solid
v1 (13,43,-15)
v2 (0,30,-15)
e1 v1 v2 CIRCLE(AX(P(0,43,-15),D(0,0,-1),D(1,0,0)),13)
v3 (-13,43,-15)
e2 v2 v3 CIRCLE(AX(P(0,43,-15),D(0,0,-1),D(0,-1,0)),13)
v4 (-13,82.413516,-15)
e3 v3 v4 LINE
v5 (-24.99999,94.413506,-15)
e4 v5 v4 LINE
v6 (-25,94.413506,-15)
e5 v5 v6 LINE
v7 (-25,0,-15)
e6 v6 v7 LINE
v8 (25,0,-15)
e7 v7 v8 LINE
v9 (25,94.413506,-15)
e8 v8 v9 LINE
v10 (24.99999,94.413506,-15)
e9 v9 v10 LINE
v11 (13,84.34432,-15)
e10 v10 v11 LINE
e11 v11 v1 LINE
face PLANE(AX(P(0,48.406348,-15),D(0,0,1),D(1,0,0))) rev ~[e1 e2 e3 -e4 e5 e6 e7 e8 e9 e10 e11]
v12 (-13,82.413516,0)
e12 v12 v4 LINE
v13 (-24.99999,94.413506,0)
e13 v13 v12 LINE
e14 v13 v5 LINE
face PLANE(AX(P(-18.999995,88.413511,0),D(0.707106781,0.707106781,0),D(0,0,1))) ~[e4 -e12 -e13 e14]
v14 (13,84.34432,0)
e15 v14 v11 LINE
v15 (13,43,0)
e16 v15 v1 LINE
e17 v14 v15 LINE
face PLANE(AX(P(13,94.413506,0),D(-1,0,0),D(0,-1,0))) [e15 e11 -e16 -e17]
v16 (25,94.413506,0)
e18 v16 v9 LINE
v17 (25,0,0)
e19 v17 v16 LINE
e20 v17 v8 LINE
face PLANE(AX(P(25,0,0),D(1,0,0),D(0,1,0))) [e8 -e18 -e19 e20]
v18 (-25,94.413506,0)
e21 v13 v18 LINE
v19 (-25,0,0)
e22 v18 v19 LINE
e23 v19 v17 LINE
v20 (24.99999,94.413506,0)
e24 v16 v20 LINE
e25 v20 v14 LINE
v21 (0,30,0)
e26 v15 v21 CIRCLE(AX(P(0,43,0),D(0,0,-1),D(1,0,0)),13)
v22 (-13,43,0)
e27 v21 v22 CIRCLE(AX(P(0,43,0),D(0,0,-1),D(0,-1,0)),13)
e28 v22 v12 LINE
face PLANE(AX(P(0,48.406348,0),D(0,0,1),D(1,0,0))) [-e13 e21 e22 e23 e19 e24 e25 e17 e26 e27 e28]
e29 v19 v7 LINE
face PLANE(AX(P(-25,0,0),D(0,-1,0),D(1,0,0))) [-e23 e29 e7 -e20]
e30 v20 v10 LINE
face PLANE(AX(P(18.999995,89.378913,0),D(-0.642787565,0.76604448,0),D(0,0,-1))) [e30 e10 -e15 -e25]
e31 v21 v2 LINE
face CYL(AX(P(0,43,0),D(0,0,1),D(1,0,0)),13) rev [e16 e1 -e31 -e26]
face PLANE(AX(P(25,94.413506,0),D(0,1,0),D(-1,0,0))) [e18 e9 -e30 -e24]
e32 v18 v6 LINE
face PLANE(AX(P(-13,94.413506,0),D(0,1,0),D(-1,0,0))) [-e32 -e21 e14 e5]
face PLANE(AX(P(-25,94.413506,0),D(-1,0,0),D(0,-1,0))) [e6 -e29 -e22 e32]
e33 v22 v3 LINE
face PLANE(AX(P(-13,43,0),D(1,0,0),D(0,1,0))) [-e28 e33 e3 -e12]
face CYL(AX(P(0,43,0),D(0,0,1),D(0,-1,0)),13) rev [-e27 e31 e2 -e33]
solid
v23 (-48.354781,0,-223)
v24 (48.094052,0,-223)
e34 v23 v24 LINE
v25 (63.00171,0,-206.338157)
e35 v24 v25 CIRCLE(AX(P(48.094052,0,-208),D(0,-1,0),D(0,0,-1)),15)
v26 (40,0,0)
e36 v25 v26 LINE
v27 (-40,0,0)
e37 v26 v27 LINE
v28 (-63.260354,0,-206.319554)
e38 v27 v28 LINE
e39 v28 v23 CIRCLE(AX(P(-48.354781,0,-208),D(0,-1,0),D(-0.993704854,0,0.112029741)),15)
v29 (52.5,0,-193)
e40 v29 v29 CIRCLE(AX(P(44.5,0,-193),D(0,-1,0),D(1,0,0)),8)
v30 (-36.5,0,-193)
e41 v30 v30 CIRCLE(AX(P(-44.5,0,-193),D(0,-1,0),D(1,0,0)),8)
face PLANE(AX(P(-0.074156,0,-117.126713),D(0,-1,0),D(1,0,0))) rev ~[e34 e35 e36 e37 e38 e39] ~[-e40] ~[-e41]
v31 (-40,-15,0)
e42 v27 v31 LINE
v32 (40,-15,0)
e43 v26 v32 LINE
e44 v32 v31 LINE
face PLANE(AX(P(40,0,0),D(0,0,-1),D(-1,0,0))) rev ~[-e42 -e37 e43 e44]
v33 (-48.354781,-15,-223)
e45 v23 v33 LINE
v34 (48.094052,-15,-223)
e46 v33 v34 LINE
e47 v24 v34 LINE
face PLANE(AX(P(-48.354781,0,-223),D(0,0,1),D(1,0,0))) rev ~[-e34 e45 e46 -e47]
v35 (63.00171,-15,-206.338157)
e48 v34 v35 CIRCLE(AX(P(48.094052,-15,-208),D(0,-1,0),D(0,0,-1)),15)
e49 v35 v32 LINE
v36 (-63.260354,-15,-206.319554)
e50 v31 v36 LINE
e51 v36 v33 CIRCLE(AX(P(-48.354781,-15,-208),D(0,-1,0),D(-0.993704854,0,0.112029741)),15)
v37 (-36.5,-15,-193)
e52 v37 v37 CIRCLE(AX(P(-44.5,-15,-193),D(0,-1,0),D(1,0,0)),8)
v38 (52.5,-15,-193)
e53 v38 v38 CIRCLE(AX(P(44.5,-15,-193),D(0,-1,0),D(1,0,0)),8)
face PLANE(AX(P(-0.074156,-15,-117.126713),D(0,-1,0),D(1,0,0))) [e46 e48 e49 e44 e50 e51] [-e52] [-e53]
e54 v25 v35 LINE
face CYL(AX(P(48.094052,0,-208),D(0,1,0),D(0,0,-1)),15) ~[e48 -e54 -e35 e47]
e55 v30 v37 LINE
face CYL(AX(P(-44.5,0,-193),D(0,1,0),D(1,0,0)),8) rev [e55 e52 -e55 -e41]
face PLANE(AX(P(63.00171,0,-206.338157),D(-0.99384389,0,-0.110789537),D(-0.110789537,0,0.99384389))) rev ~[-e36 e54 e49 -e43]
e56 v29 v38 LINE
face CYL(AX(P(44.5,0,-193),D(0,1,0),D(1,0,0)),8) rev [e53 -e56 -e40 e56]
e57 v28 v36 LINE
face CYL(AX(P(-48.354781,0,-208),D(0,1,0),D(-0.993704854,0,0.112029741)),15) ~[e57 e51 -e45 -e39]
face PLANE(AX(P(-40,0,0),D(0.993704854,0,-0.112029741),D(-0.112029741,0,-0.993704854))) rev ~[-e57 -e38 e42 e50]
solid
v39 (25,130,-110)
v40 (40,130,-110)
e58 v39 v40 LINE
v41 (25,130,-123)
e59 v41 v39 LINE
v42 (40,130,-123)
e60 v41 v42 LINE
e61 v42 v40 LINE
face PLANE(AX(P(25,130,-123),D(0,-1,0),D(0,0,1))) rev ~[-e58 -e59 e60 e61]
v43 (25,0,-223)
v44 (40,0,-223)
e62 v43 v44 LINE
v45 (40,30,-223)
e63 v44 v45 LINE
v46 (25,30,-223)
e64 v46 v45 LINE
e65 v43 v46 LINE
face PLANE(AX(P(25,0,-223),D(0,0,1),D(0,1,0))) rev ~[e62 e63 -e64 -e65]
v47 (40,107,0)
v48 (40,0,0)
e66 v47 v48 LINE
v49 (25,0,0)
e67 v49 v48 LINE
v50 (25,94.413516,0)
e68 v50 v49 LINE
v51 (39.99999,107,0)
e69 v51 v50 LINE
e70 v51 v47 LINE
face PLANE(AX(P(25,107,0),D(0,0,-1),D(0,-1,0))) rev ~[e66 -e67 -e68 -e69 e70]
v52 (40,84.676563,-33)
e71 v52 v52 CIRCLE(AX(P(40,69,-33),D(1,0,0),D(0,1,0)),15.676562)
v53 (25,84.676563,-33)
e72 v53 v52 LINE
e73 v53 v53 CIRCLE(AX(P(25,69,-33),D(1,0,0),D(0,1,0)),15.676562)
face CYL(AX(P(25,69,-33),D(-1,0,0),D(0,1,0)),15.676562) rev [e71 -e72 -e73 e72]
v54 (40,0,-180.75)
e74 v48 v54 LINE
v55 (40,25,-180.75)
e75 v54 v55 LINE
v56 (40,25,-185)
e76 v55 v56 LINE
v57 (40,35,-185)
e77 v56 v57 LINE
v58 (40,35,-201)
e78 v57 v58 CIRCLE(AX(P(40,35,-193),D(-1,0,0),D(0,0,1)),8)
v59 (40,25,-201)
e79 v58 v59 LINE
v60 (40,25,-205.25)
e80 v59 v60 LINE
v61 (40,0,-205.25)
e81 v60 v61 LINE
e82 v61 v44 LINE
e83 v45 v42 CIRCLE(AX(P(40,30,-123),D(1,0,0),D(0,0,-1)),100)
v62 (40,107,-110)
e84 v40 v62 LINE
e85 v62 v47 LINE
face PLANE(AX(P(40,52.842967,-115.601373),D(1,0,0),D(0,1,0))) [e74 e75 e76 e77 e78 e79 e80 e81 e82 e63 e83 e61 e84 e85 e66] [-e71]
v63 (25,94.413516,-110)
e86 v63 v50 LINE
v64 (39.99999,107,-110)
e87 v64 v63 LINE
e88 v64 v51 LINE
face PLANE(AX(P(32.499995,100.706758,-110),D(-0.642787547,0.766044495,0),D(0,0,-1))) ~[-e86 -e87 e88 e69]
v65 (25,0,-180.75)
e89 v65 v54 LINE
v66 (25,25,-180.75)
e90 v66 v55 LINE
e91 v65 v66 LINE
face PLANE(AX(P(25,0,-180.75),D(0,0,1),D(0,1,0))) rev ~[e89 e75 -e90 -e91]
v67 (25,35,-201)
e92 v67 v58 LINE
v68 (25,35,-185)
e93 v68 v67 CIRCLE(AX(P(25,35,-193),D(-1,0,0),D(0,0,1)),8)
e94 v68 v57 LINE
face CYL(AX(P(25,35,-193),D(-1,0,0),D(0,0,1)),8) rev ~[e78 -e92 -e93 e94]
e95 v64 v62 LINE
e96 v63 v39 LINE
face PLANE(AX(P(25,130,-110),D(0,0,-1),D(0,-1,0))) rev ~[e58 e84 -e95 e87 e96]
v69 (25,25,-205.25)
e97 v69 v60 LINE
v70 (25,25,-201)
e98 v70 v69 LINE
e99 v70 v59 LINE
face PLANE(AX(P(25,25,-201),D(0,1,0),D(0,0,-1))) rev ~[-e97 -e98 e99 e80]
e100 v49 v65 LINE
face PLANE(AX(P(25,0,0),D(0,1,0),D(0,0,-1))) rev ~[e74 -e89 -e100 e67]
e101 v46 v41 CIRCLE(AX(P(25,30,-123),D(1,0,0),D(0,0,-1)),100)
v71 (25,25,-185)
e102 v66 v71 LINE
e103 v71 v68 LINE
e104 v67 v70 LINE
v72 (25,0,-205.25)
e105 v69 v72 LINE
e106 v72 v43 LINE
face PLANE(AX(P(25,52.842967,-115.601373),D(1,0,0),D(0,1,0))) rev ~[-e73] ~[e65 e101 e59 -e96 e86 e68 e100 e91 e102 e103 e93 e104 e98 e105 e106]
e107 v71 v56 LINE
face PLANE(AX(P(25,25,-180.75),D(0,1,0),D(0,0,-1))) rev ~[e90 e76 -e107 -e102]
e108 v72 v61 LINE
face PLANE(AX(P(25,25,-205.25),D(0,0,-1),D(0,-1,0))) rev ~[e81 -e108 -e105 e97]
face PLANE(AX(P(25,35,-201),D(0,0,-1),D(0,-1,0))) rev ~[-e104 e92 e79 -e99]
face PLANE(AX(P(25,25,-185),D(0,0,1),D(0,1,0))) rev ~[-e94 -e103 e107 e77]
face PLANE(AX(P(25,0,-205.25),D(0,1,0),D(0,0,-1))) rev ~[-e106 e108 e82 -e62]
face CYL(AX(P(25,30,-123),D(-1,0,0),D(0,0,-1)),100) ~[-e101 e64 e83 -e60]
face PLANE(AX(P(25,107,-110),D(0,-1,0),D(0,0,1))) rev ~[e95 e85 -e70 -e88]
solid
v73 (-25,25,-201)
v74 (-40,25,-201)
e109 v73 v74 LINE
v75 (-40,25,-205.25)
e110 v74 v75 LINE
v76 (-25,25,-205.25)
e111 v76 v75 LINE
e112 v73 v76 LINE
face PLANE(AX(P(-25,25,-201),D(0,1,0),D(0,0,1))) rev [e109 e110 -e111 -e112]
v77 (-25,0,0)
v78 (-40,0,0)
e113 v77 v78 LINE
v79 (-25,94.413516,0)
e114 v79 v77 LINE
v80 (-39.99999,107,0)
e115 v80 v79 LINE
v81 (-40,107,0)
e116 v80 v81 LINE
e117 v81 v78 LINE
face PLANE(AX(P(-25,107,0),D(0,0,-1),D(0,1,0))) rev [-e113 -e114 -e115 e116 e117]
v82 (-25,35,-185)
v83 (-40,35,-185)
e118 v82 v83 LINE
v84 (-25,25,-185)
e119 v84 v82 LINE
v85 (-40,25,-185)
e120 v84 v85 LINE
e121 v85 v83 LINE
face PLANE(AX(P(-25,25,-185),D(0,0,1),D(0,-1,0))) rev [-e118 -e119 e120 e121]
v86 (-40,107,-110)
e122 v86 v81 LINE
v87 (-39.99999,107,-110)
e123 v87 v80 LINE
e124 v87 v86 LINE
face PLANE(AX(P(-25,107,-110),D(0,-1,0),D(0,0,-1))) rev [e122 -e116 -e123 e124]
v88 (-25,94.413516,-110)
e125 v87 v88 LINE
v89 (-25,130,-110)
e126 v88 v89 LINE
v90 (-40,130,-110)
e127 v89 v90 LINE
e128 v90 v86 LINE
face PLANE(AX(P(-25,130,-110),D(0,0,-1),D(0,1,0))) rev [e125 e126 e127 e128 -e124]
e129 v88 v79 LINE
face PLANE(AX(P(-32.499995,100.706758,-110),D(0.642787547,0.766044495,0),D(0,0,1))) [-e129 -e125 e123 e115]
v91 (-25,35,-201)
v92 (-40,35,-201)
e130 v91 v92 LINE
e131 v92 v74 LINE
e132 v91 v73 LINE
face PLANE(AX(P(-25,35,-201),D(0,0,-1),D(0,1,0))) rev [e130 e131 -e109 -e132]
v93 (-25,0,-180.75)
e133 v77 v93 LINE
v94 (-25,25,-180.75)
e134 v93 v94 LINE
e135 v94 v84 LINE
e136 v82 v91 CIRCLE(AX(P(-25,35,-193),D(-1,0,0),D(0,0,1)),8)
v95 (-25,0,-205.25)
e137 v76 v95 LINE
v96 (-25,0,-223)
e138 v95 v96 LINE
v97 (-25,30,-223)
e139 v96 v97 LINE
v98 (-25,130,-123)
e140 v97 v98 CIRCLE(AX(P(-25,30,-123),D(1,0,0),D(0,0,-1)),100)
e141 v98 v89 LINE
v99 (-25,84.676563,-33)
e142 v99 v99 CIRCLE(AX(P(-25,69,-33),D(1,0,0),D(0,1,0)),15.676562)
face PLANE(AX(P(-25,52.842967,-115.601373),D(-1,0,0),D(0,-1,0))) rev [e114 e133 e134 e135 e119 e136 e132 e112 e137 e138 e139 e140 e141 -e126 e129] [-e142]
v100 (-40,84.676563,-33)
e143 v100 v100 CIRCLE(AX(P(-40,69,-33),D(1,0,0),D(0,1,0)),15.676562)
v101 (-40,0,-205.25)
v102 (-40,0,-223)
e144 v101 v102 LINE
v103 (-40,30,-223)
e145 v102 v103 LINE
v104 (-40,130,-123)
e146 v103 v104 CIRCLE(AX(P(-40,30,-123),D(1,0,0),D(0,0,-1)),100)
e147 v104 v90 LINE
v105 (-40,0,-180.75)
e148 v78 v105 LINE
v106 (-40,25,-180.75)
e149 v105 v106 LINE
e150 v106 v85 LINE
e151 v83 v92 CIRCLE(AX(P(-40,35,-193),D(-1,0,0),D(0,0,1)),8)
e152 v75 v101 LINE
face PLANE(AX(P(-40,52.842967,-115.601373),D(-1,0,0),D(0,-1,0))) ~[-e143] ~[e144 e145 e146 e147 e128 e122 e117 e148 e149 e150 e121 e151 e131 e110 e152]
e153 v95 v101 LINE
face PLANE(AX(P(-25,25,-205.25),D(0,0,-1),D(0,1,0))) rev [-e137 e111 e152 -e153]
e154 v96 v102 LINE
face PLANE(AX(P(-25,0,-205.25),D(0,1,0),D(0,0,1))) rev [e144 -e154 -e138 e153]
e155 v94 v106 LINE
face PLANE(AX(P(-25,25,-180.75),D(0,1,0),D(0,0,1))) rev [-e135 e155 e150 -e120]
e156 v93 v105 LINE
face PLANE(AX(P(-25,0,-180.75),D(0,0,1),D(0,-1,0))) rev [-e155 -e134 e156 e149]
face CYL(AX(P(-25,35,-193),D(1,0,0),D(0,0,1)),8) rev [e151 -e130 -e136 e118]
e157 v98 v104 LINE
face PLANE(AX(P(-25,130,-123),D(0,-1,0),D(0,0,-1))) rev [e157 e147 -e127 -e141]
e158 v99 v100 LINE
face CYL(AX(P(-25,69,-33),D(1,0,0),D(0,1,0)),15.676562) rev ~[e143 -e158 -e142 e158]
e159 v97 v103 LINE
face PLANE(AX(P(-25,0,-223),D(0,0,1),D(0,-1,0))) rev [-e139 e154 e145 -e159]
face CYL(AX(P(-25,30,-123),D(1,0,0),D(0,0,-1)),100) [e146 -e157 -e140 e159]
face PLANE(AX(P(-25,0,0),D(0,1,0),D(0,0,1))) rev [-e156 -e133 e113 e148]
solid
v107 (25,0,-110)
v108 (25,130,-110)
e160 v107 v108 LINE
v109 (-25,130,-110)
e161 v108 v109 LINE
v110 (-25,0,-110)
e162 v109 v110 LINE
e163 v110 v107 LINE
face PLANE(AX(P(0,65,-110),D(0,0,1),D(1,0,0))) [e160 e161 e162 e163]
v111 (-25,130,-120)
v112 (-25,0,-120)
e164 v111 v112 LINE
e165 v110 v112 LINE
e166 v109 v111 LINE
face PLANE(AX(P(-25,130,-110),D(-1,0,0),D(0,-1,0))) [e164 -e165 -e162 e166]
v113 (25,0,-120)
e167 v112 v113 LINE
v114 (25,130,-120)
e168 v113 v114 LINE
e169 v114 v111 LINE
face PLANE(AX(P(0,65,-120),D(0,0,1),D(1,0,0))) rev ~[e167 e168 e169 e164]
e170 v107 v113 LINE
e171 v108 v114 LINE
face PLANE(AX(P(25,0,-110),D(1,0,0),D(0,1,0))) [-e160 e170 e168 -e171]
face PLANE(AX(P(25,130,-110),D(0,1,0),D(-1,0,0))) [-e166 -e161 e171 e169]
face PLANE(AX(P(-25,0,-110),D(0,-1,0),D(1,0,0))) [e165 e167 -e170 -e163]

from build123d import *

# Parameters (mm, degrees)
F0_R      = 8
F1_DEPTH  = 15
F3_START  = 25
F2_R      = 15.6765625
F3_DEPTH  = 15
F4_SIZE2  = 12.586484
F4_SIZE   = 14.99999
F7_DEPTH  = 15
F8_SIZE2  = 10.069186
F8_SIZE   = 11.99999
F9_SIZE2  = 11.99999
F9_SIZE   = 11.99999
F11_START = -110
F11_DEPTH = 10


# Not quite as in the source:
# - a fillet or chamfer is up to 0.001 mm smaller than in the source, because OpenCascade refuses the exact size


with BuildPart() as f1:
    # F0 (on Front) → F1 (new body)
    with BuildSketch(Plane.XZ):
        with BuildLine():
            Line((-48.3547807248, -223), (0, -223))
            Line((0, -223), (48.0940515583, -223))
            ThreePointArc((48.0940515583, -223), (59.27277344, -218.001808691), (63.0017099144, -206.3381569454))
            Line((63.0017099144, -206.3381569454), (40, 0))
            Line((40, 0), (0, 0))
            Line((0, 0), (-40, 0))
            Line((-40, 0), (-63.2603535366, -206.3195538826))
            ThreePointArc((-63.2603535366, -206.3195538826), (-59.5397414257, -217.9948313702), (-48.3547807248, -223))
        make_face()
        with Locations((-44.5, -193)):
            Circle(F0_R, mode=Mode.SUBTRACT)
        with Locations((44.5, -193)):
            Circle(F0_R, mode=Mode.SUBTRACT)
    extrude(amount=F1_DEPTH)


with BuildPart() as f3:
    # F2 (on Right) → F3 (new body)
    with BuildSketch(Plane.YZ.offset(F3_START)):
        with BuildLine():
            Line((107, 0), (0, 0))
            Line((0, 0), (0, -180.75))
            Line((0, -180.75), (25, -180.75))
            Line((25, -180.75), (25, -185))
            Line((25, -185), (35, -185))
            ThreePointArc((35, -185), (43, -193), (35, -201))
            Line((35, -201), (25, -201))
            Line((25, -201), (25, -205.25))
            Line((25, -205.25), (0, -205.25))
            Line((0, -205.25), (0, -223))
            Line((0, -223), (30, -223))
            ThreePointArc((30, -223), (100.7106781187, -193.7106781187), (130, -123))
            Line((130, -123), (130, -110))
            Line((130, -110), (107, -110))
            Line((107, -110), (107, 0))
        make_face()
        with Locations((69, -33)):
            Circle(F2_R, mode=Mode.SUBTRACT)
    extrude(amount=F3_DEPTH)

    # F4 (size 15 and 12.5864944677 in the source; OpenCascade refuses exactly that, so slightly less here)
    f4_edges = [f3.edges().sort_by_distance(p)[0] for p in [
        (25, 107, -55),
    ]]
    f4_side = f3.faces().sort_by_distance((32.5, 107, -55))[0]
    chamfer(f4_edges, length=F4_SIZE, length2=F4_SIZE2, reference=f4_side)


with BuildPart() as f5_1:
    # F5: instance of F3
    add(f3.part.mirror(Plane.YZ))


with BuildPart() as f7:
    # F6 (on Top) → F7 (new body)
    with BuildSketch(Plane.XY):
        with BuildLine():
            Line((-25, 0), (0, 0))
            Line((0, 0), (25, 0))
            Line((25, 0), (25, 94.4135055323))
            Line((25, 94.4135055323), (13, 94.4135055323))
            Line((13, 94.4135055323), (13, 43))
            ThreePointArc((13, 43), (9.1923881554, 33.8076118446), (0, 30))
            ThreePointArc((0, 30), (-9.1923881554, 33.8076118446), (-13, 43))
            Line((-13, 43), (-13, 94.4135055323))
            Line((-13, 94.4135055323), (-25, 94.4135055323))
            Line((-25, 94.4135055323), (-25, 0))
        make_face()
    extrude(amount=-F7_DEPTH)

    # F8 (size 12 and 10.0691955741 in the source; OpenCascade refuses exactly that, so slightly less here)
    f8_edges = [f7.edges().sort_by_distance(p)[0] for p in [
        (13, 94.413506, -7.5),
    ]]
    f8_side = f7.faces().sort_by_distance((19, 94.413506, -7.5))[0]
    chamfer(f8_edges, length=F8_SIZE, length2=F8_SIZE2, reference=f8_side)

    # F9 (size 12 and 12 in the source; OpenCascade refuses exactly that, so slightly less here)
    f9_edges = [f7.edges().sort_by_distance(p)[0] for p in [
        (-13, 94.413506, -7.5),
    ]]
    chamfer(f9_edges, length=F9_SIZE, length2=F9_SIZE2)


with BuildPart() as f11:
    # F10 (on Top) → F11 (new body)
    with BuildSketch(Plane.XY.offset(F11_START)):
        Polygon((-25, 0), (0, 0), (25, 0), (25, 130), (-25, 130), align=None)
    extrude(amount=-F11_DEPTH)


solid = Compound([f1.part, f3.part, f5_1.part, f7.part, f11.part])
